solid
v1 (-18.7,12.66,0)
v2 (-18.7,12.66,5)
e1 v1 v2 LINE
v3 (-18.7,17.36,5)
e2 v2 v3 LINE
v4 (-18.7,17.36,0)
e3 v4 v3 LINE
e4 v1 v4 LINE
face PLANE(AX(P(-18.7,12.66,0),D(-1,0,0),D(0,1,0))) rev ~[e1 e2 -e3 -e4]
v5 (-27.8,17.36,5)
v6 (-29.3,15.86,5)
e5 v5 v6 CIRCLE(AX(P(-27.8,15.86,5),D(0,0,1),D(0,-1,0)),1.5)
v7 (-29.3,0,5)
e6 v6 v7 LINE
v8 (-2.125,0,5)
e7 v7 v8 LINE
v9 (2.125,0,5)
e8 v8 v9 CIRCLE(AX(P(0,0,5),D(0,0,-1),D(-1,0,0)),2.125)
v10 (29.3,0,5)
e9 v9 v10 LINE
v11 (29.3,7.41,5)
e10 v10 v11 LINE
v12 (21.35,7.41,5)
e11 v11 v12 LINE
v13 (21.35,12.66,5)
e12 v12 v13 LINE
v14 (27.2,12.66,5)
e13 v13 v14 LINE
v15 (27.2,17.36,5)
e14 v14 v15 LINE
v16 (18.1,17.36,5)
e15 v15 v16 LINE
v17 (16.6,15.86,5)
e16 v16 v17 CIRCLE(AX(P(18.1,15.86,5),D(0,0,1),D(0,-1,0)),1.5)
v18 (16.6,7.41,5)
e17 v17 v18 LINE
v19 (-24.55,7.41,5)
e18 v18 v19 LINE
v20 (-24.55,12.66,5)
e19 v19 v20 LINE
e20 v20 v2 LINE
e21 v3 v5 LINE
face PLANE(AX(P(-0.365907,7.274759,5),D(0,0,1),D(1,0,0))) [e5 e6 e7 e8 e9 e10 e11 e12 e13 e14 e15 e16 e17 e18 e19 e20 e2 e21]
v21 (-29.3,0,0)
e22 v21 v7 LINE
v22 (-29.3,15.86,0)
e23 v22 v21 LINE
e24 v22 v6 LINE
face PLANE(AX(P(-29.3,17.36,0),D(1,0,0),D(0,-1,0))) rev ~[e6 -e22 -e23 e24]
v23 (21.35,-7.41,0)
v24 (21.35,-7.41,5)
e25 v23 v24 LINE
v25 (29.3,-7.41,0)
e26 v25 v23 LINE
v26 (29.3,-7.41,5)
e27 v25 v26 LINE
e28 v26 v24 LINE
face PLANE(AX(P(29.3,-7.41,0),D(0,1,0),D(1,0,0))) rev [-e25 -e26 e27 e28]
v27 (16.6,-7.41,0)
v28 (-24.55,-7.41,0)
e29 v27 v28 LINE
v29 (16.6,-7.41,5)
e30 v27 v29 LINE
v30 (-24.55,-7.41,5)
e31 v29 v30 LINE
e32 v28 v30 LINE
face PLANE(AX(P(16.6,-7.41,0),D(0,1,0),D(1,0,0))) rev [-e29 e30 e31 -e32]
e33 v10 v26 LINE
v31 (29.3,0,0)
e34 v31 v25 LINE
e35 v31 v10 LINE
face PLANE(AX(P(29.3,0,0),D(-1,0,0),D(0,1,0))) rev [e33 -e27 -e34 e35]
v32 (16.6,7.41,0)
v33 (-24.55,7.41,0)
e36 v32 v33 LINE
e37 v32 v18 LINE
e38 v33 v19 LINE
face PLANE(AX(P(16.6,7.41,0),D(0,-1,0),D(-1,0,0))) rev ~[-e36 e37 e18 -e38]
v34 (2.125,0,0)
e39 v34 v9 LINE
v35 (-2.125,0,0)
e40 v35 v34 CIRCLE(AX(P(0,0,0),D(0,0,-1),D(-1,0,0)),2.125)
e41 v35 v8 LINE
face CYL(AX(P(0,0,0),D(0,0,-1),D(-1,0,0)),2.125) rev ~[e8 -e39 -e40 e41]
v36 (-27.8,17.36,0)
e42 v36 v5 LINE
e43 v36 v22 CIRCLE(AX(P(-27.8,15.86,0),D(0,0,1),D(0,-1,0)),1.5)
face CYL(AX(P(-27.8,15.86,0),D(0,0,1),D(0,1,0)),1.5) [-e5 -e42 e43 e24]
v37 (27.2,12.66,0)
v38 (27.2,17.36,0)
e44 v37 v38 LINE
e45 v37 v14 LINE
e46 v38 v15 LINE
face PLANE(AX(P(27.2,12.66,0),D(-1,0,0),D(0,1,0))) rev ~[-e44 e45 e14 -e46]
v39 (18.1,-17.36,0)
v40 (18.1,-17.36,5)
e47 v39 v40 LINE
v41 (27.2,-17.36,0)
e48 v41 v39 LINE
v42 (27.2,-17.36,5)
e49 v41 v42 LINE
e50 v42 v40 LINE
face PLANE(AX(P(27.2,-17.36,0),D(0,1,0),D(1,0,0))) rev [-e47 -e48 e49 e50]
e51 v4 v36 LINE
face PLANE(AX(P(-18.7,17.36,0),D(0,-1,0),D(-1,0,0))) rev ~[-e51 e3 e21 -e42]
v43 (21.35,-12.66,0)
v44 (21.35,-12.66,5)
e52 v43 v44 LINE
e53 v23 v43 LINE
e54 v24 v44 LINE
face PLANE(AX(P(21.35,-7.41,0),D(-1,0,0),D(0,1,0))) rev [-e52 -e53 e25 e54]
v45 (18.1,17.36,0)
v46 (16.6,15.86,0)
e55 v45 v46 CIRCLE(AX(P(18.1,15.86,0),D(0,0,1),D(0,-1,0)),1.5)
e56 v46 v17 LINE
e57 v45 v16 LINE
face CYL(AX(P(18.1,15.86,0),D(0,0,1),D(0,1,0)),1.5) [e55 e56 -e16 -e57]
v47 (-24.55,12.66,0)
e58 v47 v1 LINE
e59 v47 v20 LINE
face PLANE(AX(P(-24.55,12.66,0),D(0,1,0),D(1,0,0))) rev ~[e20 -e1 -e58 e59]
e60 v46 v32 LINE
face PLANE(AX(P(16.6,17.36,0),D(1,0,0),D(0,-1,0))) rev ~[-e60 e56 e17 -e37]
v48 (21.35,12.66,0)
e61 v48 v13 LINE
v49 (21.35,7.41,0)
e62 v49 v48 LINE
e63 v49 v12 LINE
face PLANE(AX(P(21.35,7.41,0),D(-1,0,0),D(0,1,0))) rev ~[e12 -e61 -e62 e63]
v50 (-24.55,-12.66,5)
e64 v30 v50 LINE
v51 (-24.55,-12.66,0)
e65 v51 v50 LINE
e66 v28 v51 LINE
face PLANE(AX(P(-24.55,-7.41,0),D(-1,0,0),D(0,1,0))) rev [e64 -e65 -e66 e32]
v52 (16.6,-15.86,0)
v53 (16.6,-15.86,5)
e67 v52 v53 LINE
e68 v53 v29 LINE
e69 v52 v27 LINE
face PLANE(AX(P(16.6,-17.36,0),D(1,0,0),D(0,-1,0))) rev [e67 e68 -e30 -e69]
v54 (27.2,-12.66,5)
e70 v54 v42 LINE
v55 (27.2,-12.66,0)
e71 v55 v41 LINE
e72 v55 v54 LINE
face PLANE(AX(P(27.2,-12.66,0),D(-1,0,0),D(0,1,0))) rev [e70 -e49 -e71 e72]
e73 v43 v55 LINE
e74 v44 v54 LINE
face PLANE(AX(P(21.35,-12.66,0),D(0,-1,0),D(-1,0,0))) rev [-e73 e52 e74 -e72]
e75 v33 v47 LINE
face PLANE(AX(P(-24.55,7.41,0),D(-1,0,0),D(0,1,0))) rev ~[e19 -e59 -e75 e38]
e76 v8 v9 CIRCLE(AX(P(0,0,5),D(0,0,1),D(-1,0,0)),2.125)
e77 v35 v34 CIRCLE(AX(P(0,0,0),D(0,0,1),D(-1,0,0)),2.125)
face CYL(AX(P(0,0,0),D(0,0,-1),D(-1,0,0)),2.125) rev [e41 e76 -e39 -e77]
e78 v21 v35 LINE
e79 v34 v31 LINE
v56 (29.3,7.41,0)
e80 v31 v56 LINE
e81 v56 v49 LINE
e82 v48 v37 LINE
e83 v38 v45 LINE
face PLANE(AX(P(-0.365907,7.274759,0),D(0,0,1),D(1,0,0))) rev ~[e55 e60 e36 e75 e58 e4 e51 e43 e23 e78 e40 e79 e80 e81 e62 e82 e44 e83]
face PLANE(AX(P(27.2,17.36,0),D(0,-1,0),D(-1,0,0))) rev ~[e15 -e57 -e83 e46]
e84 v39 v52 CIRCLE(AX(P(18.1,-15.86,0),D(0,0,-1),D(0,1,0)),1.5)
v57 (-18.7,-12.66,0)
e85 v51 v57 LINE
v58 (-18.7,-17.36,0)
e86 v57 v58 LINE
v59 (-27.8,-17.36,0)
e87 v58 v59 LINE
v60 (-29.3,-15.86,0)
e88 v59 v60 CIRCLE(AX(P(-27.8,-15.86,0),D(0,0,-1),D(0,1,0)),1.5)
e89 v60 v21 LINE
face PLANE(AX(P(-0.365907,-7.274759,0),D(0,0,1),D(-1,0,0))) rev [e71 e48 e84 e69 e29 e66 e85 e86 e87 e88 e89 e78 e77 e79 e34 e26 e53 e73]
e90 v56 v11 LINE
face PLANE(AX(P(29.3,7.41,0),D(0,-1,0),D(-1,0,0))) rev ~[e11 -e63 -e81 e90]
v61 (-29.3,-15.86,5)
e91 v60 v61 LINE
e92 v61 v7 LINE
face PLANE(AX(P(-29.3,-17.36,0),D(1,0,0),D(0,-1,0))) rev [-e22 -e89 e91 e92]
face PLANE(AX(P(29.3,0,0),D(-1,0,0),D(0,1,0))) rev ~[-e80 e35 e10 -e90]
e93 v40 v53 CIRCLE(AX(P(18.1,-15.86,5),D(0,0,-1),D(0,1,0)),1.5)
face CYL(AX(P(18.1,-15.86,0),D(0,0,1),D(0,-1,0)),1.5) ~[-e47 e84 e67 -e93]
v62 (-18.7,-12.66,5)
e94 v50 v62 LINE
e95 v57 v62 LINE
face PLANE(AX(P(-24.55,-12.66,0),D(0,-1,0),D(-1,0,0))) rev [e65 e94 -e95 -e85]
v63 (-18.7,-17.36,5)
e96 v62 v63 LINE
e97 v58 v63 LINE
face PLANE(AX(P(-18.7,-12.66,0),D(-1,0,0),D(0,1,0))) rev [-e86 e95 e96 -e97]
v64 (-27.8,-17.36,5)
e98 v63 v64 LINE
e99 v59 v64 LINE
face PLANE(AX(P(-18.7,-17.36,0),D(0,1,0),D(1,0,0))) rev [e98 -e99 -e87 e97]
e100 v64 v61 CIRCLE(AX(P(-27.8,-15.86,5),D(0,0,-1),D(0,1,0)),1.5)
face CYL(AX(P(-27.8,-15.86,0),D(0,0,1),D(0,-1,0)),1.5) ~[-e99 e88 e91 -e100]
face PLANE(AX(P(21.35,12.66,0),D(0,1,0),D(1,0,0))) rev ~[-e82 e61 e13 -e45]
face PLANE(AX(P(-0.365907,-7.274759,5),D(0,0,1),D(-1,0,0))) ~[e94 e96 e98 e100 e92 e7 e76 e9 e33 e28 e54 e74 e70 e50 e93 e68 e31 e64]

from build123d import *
from build123d import SkipClean  # not in build123d's __all__

# Parameters (mm, degrees)
F1_DEPTH = 5
F2_R     = 1.5


with BuildPart() as f1:
    # F0 (on Top) → F1 (new body)
    with BuildSketch(Plane.XY):
        with BuildLine():
            ThreePointArc((-2.125, 0), (0, 2.125), (2.125, 0))
            Line((2.125, 0), (29.3, 0))
            Line((29.3, 0), (29.3, 7.41))
            Line((29.3, 7.41), (21.35, 7.41))
            Line((21.35, 7.41), (21.35, 12.66))
            Line((21.35, 12.66), (27.2, 12.66))
            Line((27.2, 12.66), (27.2, 17.36))
            Line((27.2, 17.36), (16.6, 17.36))
            Line((16.6, 17.36), (16.6, 7.41))
            Line((16.6, 7.41), (-24.55, 7.41))
            Line((-24.55, 7.41), (-24.55, 12.66))
            Line((-24.55, 12.66), (-18.7, 12.66))
            Line((-18.7, 12.66), (-18.7, 17.36))
            Line((-18.7, 17.36), (-29.3, 17.36))
            Line((-29.3, 17.36), (-29.3, 0))
            Line((-29.3, 0), (-2.125, 0))
        make_face()
    extrude(amount=F1_DEPTH)

    # F2
    f2_edges = [f1.edges().sort_by_distance(p)[0] for p in [
        (-29.3, 17.36, 2.5),
        (16.6, 17.36, 2.5),
    ]]
    fillet(f2_edges, radius=F2_R)

    # F3: F1 across face


with BuildPart() as f1_1:
    add(f1.part, clean=False)
    with SkipClean():  # cleaning this boolean's faces spoils the solid; the shape is the same uncleaned
        add(f1.part.mirror(Plane(origin=(-15.7125, 0, 2.5), x_dir=(1, 0, 0), z_dir=(0, -1, 0))), clean=False)


solid = f1_1.part
